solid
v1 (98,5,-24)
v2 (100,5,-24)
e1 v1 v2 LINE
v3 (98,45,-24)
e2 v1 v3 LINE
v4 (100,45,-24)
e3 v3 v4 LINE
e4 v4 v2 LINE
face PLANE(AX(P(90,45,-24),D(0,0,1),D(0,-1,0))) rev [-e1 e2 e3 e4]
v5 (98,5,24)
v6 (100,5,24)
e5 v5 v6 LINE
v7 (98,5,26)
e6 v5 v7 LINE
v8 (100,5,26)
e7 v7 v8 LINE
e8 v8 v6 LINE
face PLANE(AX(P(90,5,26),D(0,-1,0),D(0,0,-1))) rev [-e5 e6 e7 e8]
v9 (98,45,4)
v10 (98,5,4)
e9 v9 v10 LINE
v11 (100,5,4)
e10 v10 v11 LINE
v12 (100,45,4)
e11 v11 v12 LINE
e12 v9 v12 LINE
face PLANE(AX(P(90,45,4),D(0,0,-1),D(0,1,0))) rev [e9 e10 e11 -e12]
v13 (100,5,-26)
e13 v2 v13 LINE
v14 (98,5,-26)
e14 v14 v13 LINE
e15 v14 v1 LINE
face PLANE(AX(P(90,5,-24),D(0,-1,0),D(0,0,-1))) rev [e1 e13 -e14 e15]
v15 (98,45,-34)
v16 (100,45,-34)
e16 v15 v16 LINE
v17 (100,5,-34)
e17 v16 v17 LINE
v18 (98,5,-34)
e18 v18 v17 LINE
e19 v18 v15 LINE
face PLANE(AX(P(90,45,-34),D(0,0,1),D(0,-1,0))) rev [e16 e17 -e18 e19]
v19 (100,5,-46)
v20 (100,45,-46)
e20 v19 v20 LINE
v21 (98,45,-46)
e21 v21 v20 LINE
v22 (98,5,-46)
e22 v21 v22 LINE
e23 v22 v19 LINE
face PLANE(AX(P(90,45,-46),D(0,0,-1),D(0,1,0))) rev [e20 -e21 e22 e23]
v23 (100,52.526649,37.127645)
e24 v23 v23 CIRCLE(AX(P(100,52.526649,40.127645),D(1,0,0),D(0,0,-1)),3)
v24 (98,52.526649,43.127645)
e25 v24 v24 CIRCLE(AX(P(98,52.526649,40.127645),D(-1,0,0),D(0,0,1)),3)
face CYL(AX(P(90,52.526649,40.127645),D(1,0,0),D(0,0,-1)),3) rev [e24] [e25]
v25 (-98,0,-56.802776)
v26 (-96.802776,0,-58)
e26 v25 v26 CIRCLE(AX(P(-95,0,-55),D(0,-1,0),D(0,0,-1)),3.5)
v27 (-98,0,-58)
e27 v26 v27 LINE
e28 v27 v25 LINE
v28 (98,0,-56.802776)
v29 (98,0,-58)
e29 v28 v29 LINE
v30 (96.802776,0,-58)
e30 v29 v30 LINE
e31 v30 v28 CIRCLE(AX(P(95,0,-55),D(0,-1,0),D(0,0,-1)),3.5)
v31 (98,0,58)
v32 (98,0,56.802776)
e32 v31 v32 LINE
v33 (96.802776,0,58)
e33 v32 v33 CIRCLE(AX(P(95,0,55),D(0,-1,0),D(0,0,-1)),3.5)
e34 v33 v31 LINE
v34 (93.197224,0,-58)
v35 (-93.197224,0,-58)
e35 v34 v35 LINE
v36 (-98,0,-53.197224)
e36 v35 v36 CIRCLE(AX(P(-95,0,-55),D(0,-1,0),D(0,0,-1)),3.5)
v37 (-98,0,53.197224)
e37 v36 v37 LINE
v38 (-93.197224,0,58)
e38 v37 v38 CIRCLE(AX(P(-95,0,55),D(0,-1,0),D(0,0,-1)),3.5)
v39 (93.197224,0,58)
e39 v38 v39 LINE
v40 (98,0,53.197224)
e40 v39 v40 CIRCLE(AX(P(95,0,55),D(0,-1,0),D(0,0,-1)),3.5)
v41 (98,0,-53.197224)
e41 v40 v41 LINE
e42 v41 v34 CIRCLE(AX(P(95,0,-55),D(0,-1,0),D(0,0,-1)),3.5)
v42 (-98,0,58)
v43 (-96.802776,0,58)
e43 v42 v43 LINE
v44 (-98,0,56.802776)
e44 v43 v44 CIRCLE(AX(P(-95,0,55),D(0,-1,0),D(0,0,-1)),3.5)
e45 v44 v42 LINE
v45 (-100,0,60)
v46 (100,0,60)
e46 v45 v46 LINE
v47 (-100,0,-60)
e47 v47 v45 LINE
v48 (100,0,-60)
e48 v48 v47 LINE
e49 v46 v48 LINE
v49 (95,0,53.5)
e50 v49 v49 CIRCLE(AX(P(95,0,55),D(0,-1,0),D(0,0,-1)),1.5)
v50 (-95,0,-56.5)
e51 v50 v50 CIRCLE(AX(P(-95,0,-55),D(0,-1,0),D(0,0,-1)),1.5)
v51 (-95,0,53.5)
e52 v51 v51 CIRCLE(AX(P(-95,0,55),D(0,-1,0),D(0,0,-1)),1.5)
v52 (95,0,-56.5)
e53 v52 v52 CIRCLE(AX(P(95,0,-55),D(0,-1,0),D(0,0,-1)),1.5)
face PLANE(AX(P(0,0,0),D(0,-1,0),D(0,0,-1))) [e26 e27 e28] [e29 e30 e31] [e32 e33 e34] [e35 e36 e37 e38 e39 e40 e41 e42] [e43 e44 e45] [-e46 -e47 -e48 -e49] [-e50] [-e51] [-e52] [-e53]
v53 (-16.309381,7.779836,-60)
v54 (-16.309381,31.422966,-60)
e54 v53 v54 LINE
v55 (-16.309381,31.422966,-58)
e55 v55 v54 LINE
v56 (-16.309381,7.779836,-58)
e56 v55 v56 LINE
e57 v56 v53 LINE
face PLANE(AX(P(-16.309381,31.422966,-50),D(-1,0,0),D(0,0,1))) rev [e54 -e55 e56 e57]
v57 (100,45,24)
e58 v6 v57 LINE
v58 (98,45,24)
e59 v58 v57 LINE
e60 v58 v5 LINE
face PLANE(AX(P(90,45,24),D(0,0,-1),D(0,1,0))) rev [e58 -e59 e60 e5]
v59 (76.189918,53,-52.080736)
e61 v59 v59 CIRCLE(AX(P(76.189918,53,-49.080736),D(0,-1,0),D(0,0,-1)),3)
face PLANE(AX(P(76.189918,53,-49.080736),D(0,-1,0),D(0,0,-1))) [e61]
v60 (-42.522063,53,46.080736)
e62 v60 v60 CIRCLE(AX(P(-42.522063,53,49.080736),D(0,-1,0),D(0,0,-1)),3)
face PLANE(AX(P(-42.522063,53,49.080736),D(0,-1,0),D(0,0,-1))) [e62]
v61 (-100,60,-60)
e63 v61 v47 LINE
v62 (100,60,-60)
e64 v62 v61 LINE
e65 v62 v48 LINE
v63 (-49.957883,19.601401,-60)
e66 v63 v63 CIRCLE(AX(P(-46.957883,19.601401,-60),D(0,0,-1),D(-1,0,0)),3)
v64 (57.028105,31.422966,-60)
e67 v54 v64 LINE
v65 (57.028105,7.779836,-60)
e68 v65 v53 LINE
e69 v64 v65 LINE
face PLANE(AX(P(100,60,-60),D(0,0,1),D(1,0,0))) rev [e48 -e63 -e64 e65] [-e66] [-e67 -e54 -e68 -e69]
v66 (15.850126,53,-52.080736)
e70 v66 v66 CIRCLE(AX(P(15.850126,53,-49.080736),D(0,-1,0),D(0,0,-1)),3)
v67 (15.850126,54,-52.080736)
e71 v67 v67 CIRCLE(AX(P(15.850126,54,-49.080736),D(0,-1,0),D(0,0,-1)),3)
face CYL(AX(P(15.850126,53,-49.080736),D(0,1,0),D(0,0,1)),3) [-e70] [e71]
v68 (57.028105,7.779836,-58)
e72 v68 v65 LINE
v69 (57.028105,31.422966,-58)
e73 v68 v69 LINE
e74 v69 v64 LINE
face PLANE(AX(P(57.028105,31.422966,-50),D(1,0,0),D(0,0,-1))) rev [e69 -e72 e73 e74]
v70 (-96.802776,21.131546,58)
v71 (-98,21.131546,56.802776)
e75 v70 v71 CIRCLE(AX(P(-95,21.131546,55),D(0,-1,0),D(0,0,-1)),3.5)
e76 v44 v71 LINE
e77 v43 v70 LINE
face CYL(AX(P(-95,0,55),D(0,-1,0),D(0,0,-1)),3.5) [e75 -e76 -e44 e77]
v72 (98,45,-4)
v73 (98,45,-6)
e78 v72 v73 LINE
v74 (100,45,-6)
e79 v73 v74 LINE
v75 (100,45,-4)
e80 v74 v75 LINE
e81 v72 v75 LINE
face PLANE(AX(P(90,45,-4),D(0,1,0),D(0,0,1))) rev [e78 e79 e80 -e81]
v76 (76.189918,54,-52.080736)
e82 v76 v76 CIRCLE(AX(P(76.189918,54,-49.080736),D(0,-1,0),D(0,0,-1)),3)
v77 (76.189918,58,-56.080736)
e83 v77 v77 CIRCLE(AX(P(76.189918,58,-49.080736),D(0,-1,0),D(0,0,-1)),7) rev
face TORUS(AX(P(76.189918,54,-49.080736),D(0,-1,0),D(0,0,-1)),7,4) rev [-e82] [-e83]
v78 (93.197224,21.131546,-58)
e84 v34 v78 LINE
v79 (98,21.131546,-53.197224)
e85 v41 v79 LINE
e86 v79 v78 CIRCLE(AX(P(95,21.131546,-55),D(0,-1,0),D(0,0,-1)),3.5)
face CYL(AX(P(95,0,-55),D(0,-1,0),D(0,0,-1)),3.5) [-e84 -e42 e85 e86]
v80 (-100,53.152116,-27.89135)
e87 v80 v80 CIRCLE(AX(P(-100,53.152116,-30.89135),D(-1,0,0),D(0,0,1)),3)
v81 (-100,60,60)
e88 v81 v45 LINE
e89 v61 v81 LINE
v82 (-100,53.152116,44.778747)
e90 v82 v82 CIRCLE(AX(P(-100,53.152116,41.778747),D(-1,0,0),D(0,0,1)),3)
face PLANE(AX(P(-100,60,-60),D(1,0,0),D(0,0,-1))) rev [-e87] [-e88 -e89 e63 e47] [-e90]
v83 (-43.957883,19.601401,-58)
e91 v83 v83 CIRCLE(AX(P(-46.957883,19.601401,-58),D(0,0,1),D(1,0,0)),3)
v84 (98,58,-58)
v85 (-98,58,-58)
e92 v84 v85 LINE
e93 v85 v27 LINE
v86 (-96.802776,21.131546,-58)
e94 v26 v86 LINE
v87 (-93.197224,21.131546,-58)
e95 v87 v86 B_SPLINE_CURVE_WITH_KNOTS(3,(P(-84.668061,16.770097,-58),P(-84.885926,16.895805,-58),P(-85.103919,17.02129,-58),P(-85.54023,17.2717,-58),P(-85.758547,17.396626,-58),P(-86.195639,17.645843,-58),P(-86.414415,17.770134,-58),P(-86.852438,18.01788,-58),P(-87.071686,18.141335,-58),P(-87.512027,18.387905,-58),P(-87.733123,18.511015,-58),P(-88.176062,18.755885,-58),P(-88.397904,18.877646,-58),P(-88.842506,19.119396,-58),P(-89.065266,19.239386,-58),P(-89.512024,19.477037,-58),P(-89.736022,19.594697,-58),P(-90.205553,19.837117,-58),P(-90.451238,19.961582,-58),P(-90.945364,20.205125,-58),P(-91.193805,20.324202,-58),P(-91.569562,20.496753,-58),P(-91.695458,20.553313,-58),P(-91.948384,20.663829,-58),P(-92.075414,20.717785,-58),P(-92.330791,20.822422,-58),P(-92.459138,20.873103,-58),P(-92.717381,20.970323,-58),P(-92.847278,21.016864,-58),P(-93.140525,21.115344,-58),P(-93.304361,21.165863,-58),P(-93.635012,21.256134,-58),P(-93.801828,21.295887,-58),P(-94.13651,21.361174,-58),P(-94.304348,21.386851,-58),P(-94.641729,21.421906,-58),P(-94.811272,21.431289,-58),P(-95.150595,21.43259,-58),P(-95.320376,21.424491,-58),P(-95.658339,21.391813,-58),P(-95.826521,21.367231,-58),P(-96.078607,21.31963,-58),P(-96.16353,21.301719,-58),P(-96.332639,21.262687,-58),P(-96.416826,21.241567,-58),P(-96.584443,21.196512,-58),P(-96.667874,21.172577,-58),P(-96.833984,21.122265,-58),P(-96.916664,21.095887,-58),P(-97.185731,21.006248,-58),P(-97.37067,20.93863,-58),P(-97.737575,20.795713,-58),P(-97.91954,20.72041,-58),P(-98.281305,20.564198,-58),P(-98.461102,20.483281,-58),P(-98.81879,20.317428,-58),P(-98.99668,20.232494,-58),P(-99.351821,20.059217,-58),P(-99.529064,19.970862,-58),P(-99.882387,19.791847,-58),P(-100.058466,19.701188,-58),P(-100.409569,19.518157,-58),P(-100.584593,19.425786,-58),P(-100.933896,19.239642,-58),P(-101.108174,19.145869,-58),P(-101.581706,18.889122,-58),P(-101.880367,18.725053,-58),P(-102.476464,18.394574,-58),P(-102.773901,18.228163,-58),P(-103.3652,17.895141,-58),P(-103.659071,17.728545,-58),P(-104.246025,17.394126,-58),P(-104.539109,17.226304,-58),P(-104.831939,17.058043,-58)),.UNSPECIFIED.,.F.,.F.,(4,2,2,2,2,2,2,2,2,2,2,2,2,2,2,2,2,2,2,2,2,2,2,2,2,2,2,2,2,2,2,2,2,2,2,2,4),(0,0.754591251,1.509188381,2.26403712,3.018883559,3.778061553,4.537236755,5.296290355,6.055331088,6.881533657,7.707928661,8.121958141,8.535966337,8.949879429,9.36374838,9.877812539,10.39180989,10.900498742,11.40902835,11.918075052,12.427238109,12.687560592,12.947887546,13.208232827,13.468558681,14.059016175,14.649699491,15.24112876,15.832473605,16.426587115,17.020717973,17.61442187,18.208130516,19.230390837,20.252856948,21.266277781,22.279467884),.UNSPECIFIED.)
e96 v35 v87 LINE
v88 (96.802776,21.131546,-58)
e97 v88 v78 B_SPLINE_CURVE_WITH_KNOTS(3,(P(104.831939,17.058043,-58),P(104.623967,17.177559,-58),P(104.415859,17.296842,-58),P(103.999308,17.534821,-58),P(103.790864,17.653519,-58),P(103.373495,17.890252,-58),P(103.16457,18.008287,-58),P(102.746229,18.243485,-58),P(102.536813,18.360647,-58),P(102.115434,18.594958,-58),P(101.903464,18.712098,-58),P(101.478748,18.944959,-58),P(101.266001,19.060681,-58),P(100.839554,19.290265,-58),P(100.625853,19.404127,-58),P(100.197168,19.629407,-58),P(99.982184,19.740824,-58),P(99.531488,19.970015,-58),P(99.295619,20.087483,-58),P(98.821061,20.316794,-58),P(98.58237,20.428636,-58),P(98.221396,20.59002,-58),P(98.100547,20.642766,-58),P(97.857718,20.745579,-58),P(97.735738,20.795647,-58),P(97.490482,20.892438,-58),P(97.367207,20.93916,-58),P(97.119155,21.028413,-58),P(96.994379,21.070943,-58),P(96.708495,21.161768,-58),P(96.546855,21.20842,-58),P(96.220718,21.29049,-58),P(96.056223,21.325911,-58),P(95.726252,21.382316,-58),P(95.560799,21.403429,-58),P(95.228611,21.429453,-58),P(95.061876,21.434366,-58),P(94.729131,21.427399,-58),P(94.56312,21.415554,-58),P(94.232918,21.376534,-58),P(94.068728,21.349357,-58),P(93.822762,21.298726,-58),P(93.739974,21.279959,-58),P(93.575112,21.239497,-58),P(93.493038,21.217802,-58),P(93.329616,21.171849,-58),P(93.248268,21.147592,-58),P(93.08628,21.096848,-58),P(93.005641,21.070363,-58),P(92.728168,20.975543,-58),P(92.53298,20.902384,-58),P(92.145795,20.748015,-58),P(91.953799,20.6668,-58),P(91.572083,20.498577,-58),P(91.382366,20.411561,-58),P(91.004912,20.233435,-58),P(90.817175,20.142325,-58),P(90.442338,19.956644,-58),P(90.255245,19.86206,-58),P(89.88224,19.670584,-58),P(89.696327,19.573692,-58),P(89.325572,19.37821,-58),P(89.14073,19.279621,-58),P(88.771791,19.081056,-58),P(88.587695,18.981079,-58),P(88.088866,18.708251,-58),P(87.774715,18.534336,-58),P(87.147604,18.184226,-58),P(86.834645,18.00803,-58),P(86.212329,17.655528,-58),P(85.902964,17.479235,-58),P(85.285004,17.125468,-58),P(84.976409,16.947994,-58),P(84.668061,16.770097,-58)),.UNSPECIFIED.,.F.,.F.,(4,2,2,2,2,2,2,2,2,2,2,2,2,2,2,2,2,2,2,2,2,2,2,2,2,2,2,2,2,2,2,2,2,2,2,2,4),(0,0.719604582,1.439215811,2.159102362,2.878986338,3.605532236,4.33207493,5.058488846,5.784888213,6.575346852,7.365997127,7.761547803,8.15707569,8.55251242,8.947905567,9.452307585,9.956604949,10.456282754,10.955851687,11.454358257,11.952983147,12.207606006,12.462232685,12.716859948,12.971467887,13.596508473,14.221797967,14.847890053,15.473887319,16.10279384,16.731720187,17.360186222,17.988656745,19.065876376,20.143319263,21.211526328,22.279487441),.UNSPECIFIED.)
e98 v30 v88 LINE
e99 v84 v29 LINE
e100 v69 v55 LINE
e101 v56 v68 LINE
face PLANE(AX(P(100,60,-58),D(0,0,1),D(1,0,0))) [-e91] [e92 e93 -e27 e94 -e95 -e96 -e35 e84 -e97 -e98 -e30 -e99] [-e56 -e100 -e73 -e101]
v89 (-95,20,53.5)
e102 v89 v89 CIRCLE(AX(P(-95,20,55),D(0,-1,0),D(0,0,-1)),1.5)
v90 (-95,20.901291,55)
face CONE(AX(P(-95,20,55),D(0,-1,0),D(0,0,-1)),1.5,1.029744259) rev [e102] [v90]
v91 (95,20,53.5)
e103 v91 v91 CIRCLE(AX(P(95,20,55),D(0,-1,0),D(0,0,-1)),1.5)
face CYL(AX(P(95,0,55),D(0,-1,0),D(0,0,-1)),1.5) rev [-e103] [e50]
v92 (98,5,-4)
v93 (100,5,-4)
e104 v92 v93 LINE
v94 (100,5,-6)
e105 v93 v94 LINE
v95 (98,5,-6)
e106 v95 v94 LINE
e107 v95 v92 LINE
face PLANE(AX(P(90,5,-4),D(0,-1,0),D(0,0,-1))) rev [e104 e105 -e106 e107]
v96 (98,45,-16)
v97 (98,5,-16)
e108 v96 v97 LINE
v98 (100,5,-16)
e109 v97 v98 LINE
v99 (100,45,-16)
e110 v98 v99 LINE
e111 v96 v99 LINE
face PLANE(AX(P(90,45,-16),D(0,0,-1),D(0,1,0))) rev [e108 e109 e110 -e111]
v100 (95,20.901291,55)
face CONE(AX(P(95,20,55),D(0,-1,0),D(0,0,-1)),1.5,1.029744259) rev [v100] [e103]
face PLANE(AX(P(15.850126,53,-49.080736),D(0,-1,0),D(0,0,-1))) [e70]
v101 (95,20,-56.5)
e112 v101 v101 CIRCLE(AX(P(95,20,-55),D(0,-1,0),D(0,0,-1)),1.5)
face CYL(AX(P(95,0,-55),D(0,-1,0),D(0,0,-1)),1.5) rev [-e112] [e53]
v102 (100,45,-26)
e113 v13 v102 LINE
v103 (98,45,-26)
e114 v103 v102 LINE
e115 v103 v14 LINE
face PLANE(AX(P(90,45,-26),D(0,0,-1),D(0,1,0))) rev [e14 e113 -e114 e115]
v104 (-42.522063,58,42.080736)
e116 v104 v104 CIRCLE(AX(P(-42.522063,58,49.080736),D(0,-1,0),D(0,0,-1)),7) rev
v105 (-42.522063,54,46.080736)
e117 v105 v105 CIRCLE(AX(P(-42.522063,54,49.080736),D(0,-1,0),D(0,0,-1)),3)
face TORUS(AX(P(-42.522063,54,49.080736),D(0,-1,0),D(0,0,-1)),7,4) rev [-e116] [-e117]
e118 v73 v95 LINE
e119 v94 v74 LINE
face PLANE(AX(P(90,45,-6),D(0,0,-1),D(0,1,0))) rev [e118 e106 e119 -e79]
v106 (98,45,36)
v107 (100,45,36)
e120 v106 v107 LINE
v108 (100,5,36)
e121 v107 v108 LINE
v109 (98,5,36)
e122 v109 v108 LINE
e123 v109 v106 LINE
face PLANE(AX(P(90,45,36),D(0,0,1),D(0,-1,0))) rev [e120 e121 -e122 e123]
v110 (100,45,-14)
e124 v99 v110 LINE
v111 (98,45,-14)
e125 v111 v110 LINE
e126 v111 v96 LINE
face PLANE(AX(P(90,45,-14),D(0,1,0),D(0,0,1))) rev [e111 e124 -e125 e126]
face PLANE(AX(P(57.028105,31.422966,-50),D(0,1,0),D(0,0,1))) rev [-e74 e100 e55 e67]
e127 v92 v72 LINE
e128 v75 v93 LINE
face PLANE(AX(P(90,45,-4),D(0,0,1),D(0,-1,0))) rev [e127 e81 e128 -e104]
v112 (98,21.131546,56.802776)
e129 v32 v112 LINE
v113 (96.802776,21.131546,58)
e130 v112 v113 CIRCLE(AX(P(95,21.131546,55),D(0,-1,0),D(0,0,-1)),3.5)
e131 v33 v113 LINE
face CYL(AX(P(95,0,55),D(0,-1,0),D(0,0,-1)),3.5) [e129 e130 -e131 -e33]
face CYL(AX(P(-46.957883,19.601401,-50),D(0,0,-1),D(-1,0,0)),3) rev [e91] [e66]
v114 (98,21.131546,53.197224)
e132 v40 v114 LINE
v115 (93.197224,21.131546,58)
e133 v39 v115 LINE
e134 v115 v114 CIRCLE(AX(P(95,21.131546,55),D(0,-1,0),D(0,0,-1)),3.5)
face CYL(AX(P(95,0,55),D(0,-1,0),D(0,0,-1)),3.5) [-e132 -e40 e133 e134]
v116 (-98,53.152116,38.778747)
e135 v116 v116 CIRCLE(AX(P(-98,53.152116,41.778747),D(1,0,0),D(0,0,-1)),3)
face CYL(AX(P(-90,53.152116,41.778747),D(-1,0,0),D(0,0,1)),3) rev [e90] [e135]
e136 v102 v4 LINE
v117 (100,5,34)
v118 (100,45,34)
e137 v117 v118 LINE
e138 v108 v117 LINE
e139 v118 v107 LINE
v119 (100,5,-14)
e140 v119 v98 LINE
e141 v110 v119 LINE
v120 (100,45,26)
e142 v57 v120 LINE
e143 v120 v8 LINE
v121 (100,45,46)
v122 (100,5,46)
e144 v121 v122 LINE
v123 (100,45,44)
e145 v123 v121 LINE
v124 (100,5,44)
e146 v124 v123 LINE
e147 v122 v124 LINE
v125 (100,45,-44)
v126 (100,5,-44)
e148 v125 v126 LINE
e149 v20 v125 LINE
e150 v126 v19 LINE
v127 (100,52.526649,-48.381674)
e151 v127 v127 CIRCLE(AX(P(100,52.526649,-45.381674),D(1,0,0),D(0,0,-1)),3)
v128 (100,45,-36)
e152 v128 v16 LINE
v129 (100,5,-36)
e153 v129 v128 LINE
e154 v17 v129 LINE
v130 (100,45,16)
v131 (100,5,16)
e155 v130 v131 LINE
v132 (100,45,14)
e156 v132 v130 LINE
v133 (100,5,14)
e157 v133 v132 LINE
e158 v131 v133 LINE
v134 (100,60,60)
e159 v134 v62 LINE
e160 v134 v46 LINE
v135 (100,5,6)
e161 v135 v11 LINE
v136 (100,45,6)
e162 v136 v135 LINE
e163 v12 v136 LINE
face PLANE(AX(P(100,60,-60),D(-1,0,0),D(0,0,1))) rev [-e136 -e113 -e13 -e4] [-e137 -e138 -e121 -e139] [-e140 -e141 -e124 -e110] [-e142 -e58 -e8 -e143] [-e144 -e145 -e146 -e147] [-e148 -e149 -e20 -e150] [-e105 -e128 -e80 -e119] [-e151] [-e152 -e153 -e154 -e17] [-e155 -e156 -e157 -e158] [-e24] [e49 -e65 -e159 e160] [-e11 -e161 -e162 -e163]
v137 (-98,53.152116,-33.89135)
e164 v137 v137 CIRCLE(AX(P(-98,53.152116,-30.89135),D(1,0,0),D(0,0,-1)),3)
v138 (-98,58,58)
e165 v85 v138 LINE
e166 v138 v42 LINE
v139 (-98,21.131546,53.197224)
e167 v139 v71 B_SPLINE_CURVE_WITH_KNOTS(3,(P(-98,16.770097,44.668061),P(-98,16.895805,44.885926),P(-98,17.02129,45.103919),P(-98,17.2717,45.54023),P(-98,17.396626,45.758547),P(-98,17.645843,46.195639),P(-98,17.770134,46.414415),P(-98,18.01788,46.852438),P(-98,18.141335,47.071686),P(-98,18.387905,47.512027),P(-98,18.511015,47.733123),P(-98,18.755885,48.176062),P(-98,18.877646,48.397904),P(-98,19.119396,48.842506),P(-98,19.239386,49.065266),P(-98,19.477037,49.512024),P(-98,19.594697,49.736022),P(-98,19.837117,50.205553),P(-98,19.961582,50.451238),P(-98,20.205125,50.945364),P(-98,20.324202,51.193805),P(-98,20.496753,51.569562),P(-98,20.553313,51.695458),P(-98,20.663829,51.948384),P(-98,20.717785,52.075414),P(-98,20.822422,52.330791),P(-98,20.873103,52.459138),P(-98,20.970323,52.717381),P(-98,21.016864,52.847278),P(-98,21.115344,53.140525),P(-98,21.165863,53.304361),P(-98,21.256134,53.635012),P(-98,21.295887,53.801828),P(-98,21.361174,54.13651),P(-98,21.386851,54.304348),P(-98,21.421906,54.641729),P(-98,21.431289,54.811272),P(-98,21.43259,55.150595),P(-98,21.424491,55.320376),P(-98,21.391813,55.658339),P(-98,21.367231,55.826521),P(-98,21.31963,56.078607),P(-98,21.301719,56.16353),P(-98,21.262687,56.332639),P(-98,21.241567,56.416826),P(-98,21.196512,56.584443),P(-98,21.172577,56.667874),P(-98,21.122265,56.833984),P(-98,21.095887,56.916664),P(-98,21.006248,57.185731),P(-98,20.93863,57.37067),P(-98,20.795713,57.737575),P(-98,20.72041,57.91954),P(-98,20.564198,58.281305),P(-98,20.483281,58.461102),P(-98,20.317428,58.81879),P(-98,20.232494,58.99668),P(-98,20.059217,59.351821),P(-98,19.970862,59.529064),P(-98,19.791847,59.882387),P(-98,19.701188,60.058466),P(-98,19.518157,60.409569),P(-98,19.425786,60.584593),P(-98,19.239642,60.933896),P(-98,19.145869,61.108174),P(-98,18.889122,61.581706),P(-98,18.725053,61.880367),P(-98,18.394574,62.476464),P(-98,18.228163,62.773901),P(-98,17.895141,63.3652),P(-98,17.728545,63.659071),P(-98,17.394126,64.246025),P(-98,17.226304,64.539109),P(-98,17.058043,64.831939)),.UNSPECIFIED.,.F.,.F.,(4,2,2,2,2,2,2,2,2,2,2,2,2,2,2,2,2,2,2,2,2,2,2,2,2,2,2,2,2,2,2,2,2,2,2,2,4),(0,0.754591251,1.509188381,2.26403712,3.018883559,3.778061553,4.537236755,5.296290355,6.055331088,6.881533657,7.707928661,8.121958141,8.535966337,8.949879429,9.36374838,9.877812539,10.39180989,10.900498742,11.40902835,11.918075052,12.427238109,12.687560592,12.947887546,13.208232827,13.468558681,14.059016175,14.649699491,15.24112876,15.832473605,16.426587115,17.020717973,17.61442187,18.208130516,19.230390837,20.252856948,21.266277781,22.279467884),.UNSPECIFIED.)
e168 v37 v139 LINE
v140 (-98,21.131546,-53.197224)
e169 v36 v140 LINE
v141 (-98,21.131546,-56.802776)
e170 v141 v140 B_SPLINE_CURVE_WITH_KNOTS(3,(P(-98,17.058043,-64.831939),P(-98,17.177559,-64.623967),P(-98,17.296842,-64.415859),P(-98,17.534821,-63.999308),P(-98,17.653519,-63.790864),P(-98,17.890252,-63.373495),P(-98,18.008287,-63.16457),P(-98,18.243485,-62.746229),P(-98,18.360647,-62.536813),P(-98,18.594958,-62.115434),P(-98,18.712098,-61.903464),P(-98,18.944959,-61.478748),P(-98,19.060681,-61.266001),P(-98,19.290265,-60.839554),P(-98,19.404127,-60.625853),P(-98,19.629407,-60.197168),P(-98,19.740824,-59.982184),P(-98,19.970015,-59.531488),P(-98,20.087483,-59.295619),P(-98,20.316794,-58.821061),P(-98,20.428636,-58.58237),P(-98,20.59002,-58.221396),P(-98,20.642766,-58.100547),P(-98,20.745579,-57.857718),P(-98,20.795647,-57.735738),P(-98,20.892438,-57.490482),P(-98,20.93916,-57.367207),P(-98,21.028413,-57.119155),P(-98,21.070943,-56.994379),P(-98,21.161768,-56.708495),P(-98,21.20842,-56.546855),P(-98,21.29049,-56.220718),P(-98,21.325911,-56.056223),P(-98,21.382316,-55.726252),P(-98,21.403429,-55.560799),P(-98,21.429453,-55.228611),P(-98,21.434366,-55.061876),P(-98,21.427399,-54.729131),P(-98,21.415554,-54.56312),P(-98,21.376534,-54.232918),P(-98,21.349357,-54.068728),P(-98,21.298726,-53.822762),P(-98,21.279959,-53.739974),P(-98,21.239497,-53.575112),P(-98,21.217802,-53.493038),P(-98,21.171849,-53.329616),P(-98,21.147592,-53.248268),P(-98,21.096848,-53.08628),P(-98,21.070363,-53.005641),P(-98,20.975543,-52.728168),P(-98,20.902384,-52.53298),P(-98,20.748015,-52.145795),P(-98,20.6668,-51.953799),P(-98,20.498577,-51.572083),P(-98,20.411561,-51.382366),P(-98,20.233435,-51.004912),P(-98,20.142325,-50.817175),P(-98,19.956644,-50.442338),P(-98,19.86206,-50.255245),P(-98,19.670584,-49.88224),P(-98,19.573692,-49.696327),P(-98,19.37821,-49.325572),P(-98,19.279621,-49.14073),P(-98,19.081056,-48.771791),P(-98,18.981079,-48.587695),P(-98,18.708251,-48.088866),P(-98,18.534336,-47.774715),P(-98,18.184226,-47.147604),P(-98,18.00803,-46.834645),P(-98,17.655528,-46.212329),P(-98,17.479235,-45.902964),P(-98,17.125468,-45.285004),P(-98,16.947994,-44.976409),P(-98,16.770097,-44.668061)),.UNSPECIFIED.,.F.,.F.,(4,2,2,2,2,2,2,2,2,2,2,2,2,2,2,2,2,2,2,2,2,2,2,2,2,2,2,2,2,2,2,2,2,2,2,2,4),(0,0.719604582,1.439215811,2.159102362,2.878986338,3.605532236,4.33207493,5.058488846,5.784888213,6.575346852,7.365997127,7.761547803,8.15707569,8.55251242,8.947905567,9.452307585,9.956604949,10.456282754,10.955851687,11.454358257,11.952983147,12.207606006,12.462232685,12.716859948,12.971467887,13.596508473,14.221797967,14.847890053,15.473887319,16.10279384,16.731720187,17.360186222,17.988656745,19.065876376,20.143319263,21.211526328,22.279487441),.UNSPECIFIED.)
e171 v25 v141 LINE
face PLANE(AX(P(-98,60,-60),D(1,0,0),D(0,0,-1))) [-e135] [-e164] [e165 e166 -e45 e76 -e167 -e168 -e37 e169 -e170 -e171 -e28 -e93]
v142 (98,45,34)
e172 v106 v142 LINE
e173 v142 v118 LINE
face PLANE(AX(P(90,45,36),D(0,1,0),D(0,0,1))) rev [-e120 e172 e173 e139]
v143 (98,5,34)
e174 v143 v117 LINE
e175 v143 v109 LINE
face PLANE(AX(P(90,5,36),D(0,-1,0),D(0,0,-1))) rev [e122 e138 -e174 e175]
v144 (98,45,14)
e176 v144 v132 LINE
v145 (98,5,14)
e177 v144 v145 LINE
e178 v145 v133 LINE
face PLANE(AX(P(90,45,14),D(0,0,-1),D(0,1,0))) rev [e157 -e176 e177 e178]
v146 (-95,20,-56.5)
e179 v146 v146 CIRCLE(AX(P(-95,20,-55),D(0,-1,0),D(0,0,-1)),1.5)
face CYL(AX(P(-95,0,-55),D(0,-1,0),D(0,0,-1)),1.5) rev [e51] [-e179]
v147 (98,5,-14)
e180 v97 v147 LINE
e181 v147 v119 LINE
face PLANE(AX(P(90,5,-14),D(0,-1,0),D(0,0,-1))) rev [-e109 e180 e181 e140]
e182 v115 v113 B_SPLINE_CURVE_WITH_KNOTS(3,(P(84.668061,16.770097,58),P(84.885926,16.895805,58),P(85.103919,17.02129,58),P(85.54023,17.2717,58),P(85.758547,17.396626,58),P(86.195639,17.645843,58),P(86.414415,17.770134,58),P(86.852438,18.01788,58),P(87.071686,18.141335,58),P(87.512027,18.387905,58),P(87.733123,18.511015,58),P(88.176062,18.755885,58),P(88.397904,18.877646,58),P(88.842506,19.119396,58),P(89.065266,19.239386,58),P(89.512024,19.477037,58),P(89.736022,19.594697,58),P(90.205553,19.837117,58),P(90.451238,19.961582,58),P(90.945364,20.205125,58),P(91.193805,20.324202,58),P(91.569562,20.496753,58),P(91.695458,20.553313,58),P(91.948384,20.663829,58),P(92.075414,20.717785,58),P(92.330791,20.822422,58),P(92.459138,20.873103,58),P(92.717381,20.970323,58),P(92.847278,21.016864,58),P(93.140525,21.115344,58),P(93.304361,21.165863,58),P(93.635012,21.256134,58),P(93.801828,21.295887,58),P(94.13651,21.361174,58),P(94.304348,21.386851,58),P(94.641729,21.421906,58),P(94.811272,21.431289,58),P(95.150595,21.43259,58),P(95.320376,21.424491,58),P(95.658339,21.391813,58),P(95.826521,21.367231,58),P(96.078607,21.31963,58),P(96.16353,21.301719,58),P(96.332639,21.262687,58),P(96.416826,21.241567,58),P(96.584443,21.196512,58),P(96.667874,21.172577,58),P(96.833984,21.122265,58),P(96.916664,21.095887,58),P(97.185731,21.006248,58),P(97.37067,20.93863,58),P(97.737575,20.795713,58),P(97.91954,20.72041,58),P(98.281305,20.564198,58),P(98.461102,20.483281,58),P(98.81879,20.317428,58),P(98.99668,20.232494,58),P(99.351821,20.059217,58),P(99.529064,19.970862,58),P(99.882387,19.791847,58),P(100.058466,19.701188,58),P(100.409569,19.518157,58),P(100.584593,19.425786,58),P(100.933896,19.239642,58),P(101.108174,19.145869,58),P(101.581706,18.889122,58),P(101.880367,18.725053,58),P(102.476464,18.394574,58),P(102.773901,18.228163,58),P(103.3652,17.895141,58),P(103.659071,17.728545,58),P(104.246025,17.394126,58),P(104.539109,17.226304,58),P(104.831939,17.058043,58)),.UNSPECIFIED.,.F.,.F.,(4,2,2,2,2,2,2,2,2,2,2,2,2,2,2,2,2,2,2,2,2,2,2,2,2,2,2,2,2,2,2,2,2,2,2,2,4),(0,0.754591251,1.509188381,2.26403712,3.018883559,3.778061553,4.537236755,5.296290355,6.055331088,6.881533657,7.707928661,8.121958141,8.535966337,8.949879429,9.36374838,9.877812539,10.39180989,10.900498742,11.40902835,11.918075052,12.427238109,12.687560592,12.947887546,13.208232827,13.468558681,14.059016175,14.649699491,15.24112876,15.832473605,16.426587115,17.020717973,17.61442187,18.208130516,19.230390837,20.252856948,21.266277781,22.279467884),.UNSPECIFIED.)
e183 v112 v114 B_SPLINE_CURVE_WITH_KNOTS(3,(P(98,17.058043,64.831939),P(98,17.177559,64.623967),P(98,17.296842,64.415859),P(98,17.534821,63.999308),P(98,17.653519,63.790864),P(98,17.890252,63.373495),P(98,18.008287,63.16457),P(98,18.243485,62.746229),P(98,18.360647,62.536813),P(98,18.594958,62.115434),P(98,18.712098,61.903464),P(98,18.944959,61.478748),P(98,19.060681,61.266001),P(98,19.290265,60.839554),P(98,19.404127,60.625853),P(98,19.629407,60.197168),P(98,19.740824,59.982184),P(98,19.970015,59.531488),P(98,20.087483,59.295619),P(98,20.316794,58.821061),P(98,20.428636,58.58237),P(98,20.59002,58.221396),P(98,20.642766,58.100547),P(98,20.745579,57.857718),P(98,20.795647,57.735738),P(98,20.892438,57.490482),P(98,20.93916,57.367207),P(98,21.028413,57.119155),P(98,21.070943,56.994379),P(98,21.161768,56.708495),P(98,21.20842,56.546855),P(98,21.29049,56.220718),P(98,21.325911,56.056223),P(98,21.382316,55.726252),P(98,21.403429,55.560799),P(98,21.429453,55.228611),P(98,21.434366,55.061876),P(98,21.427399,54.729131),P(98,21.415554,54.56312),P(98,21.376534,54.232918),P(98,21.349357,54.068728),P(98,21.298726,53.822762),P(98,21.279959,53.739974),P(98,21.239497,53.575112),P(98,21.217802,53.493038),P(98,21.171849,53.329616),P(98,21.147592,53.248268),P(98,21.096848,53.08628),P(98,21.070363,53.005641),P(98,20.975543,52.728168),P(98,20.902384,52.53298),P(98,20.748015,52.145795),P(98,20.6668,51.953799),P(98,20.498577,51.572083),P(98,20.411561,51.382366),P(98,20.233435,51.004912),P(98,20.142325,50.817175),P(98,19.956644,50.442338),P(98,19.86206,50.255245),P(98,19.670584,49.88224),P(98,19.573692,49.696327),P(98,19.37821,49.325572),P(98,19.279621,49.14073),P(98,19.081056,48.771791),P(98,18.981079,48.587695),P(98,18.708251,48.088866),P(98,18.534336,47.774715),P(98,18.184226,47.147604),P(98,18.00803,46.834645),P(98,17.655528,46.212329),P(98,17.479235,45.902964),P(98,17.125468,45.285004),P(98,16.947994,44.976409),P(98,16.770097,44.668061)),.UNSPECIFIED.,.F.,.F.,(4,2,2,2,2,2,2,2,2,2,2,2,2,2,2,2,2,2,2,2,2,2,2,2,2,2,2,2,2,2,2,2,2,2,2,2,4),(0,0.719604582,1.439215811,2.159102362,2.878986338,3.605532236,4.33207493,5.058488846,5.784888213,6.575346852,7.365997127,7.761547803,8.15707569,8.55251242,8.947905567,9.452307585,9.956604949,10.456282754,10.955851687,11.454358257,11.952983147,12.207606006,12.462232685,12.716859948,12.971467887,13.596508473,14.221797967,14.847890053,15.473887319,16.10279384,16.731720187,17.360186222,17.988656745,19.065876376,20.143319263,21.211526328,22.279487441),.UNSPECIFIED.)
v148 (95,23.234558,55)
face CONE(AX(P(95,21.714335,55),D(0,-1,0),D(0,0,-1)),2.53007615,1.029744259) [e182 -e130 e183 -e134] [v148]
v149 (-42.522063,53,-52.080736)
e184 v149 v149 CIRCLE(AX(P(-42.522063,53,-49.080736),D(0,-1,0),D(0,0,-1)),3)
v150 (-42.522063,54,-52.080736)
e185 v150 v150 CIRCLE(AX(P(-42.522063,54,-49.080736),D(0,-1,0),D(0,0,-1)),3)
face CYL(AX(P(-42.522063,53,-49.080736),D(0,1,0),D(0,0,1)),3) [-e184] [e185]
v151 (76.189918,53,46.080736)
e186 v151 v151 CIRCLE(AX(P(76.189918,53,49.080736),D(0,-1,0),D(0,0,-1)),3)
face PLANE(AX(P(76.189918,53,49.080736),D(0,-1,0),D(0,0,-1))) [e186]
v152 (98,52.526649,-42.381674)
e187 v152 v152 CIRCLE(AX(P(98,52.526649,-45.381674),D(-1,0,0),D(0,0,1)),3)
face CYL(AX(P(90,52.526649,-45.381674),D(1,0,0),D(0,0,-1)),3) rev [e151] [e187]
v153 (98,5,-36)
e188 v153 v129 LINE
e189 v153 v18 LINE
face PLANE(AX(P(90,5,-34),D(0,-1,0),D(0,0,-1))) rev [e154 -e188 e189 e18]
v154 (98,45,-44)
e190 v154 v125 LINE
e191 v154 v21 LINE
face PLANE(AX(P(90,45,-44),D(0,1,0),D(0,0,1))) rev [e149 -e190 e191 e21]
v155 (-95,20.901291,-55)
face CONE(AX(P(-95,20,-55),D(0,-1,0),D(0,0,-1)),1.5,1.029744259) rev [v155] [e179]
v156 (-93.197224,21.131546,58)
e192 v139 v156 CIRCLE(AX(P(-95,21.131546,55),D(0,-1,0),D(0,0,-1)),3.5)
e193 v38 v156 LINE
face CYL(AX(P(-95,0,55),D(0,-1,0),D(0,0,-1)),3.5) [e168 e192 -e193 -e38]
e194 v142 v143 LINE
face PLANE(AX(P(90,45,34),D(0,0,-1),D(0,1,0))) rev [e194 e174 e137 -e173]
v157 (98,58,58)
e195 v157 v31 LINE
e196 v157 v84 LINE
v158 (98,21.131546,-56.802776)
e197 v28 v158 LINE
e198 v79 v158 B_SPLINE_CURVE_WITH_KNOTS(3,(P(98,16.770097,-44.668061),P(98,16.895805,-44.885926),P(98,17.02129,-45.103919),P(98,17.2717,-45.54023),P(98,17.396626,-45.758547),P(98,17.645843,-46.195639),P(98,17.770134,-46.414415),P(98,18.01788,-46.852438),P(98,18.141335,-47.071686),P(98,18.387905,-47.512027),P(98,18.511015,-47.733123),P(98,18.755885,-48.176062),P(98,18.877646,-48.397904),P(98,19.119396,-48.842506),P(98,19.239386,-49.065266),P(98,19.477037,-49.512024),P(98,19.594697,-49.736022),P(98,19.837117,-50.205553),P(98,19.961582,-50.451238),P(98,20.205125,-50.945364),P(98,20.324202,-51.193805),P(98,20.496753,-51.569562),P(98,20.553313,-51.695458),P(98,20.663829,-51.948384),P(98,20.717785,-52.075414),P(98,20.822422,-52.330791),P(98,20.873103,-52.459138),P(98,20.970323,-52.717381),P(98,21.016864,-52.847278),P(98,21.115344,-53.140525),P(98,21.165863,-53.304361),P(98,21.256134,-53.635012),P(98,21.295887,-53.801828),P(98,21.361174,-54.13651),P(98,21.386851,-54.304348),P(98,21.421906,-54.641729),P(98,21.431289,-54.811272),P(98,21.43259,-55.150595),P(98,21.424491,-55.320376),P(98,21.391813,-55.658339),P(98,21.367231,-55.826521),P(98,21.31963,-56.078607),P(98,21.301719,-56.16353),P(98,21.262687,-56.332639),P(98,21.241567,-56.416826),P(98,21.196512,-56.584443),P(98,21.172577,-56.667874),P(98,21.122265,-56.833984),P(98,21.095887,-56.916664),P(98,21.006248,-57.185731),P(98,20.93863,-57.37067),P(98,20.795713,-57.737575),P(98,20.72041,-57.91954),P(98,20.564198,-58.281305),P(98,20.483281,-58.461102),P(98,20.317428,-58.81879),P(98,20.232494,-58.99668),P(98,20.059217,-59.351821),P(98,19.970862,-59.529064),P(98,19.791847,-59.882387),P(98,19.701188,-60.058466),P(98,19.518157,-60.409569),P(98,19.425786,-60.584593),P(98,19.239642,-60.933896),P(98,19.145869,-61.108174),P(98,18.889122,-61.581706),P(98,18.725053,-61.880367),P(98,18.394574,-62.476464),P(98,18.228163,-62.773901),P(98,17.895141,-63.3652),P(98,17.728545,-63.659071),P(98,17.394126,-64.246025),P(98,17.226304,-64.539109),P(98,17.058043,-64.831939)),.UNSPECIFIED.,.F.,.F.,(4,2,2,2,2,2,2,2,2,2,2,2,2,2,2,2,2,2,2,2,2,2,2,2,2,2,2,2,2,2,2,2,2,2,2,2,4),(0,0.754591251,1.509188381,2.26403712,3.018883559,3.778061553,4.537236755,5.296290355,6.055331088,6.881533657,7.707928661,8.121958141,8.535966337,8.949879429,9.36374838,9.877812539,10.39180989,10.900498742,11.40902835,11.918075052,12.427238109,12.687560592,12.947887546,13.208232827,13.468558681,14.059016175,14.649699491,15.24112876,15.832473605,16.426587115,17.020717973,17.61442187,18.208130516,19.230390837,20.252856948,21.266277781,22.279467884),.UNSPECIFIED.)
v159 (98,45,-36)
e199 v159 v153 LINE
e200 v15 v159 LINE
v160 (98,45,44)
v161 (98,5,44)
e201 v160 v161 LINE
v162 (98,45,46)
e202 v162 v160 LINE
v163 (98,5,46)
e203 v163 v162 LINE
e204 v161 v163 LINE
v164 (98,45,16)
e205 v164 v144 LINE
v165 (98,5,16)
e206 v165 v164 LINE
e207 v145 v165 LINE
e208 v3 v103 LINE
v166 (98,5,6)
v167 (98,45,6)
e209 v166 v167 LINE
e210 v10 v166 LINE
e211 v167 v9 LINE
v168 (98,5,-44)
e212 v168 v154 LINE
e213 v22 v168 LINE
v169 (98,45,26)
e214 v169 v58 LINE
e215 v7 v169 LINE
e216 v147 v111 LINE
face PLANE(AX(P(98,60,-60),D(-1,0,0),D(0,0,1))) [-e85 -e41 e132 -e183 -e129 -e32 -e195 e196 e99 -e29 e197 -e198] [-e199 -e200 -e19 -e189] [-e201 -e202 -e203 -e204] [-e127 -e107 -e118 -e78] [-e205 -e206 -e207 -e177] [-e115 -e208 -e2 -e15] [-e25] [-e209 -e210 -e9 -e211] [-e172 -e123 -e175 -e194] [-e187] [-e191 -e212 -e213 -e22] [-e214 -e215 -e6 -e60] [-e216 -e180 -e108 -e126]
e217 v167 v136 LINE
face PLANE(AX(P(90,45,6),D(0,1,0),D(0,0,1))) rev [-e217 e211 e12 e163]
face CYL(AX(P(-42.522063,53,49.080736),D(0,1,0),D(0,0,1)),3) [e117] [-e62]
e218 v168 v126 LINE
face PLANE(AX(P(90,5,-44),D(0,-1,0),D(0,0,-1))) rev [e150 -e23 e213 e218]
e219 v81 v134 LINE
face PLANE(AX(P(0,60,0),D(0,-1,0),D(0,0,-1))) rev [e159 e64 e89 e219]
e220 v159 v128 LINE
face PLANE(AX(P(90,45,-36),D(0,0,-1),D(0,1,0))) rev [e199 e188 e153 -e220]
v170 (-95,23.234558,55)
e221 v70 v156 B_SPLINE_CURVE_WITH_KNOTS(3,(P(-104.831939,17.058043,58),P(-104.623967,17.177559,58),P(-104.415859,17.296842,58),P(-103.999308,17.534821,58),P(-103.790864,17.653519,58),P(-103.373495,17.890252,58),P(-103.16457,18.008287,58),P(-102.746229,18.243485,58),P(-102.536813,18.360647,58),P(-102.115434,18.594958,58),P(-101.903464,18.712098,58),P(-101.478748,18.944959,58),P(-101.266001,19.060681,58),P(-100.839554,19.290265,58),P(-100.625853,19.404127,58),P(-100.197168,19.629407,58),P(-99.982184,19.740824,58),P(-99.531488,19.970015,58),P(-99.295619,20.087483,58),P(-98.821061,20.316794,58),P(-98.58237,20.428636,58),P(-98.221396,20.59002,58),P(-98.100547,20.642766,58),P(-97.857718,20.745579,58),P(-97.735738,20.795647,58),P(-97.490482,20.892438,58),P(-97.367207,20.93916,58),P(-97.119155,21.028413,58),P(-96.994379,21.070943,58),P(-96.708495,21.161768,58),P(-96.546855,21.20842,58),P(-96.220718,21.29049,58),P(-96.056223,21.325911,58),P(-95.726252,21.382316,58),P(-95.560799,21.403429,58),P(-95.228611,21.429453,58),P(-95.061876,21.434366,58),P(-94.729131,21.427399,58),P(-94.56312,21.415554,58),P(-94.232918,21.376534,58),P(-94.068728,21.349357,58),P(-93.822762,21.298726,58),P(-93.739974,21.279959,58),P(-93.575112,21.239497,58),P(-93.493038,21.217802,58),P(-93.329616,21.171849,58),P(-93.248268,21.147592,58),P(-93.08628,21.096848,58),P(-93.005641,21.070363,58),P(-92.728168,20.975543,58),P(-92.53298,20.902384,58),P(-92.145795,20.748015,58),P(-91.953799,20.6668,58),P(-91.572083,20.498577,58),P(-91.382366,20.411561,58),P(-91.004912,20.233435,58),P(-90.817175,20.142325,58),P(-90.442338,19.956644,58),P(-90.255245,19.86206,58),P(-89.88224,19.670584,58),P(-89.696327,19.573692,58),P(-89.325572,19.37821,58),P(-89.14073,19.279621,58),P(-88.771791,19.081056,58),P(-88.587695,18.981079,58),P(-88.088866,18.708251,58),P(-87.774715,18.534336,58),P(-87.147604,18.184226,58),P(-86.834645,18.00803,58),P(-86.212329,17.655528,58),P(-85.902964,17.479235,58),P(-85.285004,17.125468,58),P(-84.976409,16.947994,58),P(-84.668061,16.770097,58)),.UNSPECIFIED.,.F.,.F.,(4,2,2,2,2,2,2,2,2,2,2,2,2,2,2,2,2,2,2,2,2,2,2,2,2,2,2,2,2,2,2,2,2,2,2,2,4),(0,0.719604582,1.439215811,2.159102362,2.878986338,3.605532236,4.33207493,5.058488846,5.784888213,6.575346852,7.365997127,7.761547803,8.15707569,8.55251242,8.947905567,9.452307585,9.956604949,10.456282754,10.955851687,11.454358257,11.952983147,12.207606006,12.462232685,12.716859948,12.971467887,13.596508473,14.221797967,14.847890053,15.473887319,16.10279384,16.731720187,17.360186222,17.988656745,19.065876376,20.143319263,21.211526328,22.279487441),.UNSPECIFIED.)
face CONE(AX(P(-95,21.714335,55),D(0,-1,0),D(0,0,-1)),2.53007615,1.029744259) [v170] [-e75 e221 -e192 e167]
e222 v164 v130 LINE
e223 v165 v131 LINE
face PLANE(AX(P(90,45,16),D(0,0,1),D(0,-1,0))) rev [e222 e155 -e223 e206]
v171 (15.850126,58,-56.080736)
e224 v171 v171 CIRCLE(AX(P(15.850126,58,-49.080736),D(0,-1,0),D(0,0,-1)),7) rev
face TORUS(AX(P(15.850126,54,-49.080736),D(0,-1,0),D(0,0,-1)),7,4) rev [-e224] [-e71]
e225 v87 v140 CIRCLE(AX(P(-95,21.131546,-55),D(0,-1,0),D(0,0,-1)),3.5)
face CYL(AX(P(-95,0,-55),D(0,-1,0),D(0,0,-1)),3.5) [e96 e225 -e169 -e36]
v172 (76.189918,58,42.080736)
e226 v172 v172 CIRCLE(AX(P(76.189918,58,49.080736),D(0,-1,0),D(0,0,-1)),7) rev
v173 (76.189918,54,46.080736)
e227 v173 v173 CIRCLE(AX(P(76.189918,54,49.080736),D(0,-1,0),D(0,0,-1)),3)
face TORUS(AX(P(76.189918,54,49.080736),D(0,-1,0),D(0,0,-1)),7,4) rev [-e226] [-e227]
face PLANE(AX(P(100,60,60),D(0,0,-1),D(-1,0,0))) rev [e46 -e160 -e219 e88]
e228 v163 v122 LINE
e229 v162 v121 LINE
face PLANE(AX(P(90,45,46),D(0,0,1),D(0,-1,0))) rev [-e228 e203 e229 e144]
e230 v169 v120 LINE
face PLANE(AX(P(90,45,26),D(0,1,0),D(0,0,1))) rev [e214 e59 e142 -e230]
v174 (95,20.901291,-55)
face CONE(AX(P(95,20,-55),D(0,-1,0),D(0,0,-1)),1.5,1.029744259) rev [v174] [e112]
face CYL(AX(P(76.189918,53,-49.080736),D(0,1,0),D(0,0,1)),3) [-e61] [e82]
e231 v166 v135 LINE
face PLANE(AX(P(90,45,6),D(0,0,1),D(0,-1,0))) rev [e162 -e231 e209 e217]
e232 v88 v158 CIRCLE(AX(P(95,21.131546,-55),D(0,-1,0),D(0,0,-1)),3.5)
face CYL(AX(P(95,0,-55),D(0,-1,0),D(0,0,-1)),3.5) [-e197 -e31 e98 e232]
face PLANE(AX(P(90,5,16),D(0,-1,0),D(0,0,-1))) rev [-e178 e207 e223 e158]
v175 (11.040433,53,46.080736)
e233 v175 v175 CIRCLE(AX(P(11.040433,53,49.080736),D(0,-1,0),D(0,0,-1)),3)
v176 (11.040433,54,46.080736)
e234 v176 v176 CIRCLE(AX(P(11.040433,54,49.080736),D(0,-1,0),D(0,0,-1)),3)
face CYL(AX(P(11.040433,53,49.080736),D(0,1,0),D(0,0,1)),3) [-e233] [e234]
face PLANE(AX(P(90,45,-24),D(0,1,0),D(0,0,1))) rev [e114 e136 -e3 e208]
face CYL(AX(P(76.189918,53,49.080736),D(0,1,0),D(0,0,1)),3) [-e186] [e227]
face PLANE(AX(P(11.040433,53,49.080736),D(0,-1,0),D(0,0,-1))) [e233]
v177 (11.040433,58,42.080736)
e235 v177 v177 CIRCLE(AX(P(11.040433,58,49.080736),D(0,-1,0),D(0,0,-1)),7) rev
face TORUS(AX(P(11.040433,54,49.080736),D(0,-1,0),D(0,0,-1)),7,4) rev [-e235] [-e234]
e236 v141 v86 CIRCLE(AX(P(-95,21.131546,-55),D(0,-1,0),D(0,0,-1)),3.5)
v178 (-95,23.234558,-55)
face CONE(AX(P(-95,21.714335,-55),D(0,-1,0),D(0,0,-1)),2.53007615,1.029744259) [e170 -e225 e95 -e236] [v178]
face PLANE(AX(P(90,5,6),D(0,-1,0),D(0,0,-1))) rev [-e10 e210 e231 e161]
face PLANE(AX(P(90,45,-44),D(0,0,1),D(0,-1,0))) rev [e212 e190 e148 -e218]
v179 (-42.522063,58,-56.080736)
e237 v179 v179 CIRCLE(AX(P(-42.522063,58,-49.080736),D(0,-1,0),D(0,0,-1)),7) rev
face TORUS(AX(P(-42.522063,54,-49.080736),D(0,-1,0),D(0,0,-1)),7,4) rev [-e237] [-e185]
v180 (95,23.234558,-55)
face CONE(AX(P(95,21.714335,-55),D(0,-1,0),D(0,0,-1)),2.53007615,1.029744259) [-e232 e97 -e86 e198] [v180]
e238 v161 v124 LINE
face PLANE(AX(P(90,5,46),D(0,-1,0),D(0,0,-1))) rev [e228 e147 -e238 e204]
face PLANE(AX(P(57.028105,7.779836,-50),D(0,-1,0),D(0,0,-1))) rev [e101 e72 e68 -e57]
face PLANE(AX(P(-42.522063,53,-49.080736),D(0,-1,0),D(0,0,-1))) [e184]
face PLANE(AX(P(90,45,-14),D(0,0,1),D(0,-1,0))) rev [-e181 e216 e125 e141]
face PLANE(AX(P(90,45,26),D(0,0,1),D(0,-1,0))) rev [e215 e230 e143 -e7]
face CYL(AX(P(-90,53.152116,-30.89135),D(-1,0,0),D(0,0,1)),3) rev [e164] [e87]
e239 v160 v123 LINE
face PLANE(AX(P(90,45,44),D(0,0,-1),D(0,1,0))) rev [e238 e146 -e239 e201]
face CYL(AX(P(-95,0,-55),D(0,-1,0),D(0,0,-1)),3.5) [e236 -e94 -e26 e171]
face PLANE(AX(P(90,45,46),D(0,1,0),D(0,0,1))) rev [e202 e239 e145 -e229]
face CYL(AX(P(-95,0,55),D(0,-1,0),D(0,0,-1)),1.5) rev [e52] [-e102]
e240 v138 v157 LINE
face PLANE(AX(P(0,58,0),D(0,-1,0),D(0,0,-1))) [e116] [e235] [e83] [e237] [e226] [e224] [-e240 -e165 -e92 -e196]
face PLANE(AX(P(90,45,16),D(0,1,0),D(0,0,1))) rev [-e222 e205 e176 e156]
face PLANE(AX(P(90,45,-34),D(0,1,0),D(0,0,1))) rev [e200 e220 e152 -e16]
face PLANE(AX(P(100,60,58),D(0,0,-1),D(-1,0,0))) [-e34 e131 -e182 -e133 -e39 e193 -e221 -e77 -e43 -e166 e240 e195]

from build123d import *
from OCP.BRepAlgoAPI import BRepAlgoAPI_Cut
from OCP.TopTools import TopTools_ListOfShape

# Parameters (mm, degrees)
SKETCH2_W                 = 200
SKETCH2_H                 = 120
BOSS_EXTRUDE1_DEPTH       = 60
F_3_0MM_DOWEL_HOLE1_D     = 3
F_3_0MM_DOWEL_HOLE1_DEPTH = 20
F_3_0MM_DOWEL_HOLE1_TIP   = 0.901290929
SHELL23_DEPTH             = 58
SHELL23_START             = 21.131545056
SHELL23_2_DEPTH           = 36.868454944
SKETCH13_R                = 3
CUT_EXTRUDE5_DEPTH        = 10
SKETCH14_R                = 3
BOSS_EXTRUDE2_DEPTH       = 5
FILLET11_R                = 4
SKETCH15_R                = 3
SKETCH15_W                = 73.337485677
SKETCH15_H                = 23.643129711
CUT_EXTRUDE6_DEPTH        = 10
SKETCH16_W                = 2
SKETCH16_H                = 40
CUT_EXTRUDE7_DEPTH        = 10
LPATTERN1_COUNT           = 10
LPATTERN1_PITCH           = 10
SKETCH18_R                = 3
CUT_EXTRUDE8_DEPTH        = 10


with BuildPart() as part:
    # Sketch2 → Boss-Extrude1 (new body)
    with BuildSketch(Plane(origin=(0, 0, 0), x_dir=(1, 0, 0), z_dir=(0, 1, 0))):
        Rectangle(SKETCH2_W, SKETCH2_H)
    extrude(amount=BOSS_EXTRUDE1_DEPTH)

    # Ø3.0mm Dowel Hole1
    with Locations(Plane(origin=(-95, 0, 55), x_dir=(0, 0, -1), z_dir=(0, -1, 0))):
        with Locations((0, 0), (110, 0), (110, 190), (0, 190)):
            Hole(F_3_0MM_DOWEL_HOLE1_D / 2, depth=F_3_0MM_DOWEL_HOLE1_DEPTH)
            with Locations((0, 0, -(F_3_0MM_DOWEL_HOLE1_DEPTH + F_3_0MM_DOWEL_HOLE1_TIP / 2))):  # 118° drill point
                Cone(0, F_3_0MM_DOWEL_HOLE1_D / 2, F_3_0MM_DOWEL_HOLE1_TIP, mode=Mode.SUBTRACT)


with BuildPart() as shell23_tool:
    # Shell23: read off the stored shape, not the designer's step
    # Shell23 outline → Shell23 (new body)
    with BuildSketch(Plane(origin=(0, 0, 0), x_dir=(1, 0, 0), z_dir=(0, 1, 0))):
        with BuildLine():
            Line((-98, -58), (-96.802775638, -58))
            ThreePointArc((-96.802775638, -58), (-97.474873734, -57.474873734), (-98, -56.802775638))
            Line((-98, -56.802775638), (-98, -58))
        make_face()
        with BuildLine():
            ThreePointArc((-98, -53.197224362), (-92.525126266, -52.525126266), (-93.197224362, -58))
            Line((-93.197224362, -58), (93.197224362, -58))
            ThreePointArc((93.197224362, -58), (92.525126266, -52.525126266), (98, -53.197224362))
            Line((98, -53.197224362), (98, 53.197224362))
            ThreePointArc((98, 53.197224362), (92.525126266, 52.525126266), (93.197224362, 58))
            Line((93.197224362, 58), (-93.197224362, 58))
            ThreePointArc((-93.197224362, 58), (-92.525126266, 52.525126266), (-98, 53.197224362))
            Line((-98, 53.197224362), (-98, -53.197224362))
        make_face()
        with BuildLine():
            ThreePointArc((98, -56.802775638), (97.474873734, -57.474873734), (96.802775638, -58))
            Line((96.802775638, -58), (98, -58))
            Line((98, -58), (98, -56.802775638))
        make_face()
        with BuildLine():
            Line((-98, 58), (-98, 56.802775638))
            ThreePointArc((-98, 56.802775638), (-97.474873734, 57.474873734), (-96.802775638, 58))
            Line((-96.802775638, 58), (-98, 58))
        make_face()
        with BuildLine():
            ThreePointArc((96.802775638, 58), (97.474873734, 57.474873734), (98, 56.802775638))
            Line((98, 56.802775638), (98, 58))
            Line((98, 58), (96.802775638, 58))
        make_face()
    extrude(amount=SHELL23_DEPTH)


with BuildPart() as part_1:
    add(part.part)

    # Shell23: cut by shell23_tool, with a tolerance
    shell23_stock = TopTools_ListOfShape()
    shell23_stock.Append(part_1.part.wrapped)
    shell23_tools = TopTools_ListOfShape()
    shell23_tools.Append(shell23_tool.part.wrapped)
    shell23_cut = BRepAlgoAPI_Cut()
    shell23_cut.SetArguments(shell23_stock)
    shell23_cut.SetTools(shell23_tools)
    shell23_cut.SetFuzzyValue(0.00001)
    shell23_cut.Build()
    add(Compound.cast(shell23_cut.Shape()).solids(), mode=Mode.REPLACE)


with BuildPart() as shell23_2_tool:
    # Shell23 2 outline → Shell23 2 (new body)
    with BuildSketch(Plane(origin=(0, 0, 0), x_dir=(1, 0, 0), z_dir=(0, 1, 0)).offset(SHELL23_START)):
        with BuildLine():
            ThreePointArc((-98, -56.802775638), (-97.474873734, -57.474873734), (-96.802775638, -58))
            Line((-96.802775638, -58), (-93.197224362, -58))
            ThreePointArc((-93.197224362, -58), (-92.525126266, -52.525126266), (-98, -53.197224362))
            Line((-98, -53.197224362), (-98, -56.802775638))
        make_face()
        with BuildLine():
            ThreePointArc((98, -53.197224362), (92.525126266, -52.525126266), (93.197224362, -58))
            Line((93.197224362, -58), (96.802775638, -58))
            ThreePointArc((96.802775638, -58), (97.474873734, -57.474873734), (98, -56.802775638))
            Line((98, -56.802775638), (98, -53.197224362))
        make_face()
        with BuildLine():
            Line((-98, 56.802775638), (-98, 53.197224362))
            ThreePointArc((-98, 53.197224362), (-92.525126266, 52.525126266), (-93.197224362, 58))
            Line((-93.197224362, 58), (-96.802775638, 58))
            ThreePointArc((-96.802775638, 58), (-97.474873734, 57.474873734), (-98, 56.802775638))
        make_face()
        with BuildLine():
            ThreePointArc((93.197224362, 58), (92.525126266, 52.525126266), (98, 53.197224362))
            Line((98, 53.197224362), (98, 56.802775638))
            ThreePointArc((98, 56.802775638), (97.474873734, 57.474873734), (96.802775638, 58))
            Line((96.802775638, 58), (93.197224362, 58))
        make_face()
    extrude(amount=SHELL23_2_DEPTH)


with BuildPart() as part_2:
    add(part_1.part)

    # Shell23 2: cut by shell23_2_tool, with a tolerance
    shell23_2_stock = TopTools_ListOfShape()
    shell23_2_stock.Append(part_2.part.wrapped)
    shell23_2_tools = TopTools_ListOfShape()
    shell23_2_tools.Append(shell23_2_tool.part.wrapped)
    shell23_2_cut = BRepAlgoAPI_Cut()
    shell23_2_cut.SetArguments(shell23_2_stock)
    shell23_2_cut.SetTools(shell23_2_tools)
    shell23_2_cut.SetFuzzyValue(0.00001)
    shell23_2_cut.Build()
    add(Compound.cast(shell23_2_cut.Shape()).solids(), mode=Mode.REPLACE)


with BuildPart() as shell23_3_tool:
    # Shell23 3 outline → Shell23 3 (revolve)
    with BuildSketch(Plane(origin=(-95, 0, -55), x_dir=(1, 0, 0), z_dir=(0, 0, 1))):
        Polygon((3.50000013, 21.131545478), (0, 23.234557723), (0, 21.131545056), align=None)
    revolve(axis=Axis((-95, 0, -55), (0, 1, 0)))


with BuildPart() as part_3:
    add(part_2.part)


with BuildPart() as part_4:
    # Shell23 3: joined with shell23_3_tool
    add(part_3.part.fuse(shell23_3_tool.part, tol=0.00001))


with BuildPart() as shell23_4_tool:
    # Shell23 4 outline → Shell23 4 (revolve)
    with BuildSketch(Plane(origin=(-95, 0, 55), x_dir=(1, 0, 0), z_dir=(0, 0, 1))):
        Polygon((3.50000013, 21.131545478), (0, 23.234557723), (0, 21.131545056), align=None)
    revolve(axis=Axis((-95, 0, 55), (0, 1, 0)))


with BuildPart() as part_5:
    add(part_4.part)


with BuildPart() as part_6:
    # Shell23 4: joined with shell23_4_tool
    add(part_5.part.fuse(shell23_4_tool.part, tol=0.00001))


with BuildPart() as shell23_5_tool:
    # Shell23 5 outline → Shell23 5 (revolve)
    with BuildSketch(Plane(origin=(95, 0, -55), x_dir=(1, 0, 0), z_dir=(0, 0, 1))):
        Polygon((3.50000013, 21.131545478), (0, 23.234557723), (0, 21.131545056), align=None)
    revolve(axis=Axis((95, 0, -55), (0, 1, 0)))


with BuildPart() as part_7:
    add(part_6.part)


with BuildPart() as part_8:
    # Shell23 5: joined with shell23_5_tool
    add(part_7.part.fuse(shell23_5_tool.part, tol=0.00001))


with BuildPart() as shell23_6_tool:
    # Shell23 6 outline → Shell23 6 (revolve)
    with BuildSketch(Plane(origin=(95, 0, 55), x_dir=(1, 0, 0), z_dir=(0, 0, 1))):
        Polygon((3.50000013, 21.131545478), (0, 23.234557723), (0, 21.131545056), align=None)
    revolve(axis=Axis((95, 0, 55), (0, 1, 0)))


with BuildPart() as part_9:
    add(part_8.part)


with BuildPart() as part_10:
    # Shell23 6: joined with shell23_6_tool
    add(part_9.part.fuse(shell23_6_tool.part, tol=0.00001))

    # Sketch13 → Cut-Extrude5 (cut)
    with BuildSketch(Plane.ZY.offset(100)):
        with Locations((-30.891349638, 53.152115546)):
            Circle(SKETCH13_R)
        with Locations((41.77874675, 53.152115546)):
            Circle(SKETCH13_R)
    extrude(amount=-CUT_EXTRUDE5_DEPTH, mode=Mode.SUBTRACT)

    # Sketch14 → Boss-Extrude2 (add)
    with BuildSketch(Plane.XZ.offset(-58)):
        with Locations(Location((76.189917543, 49.080735978, 0), (0, 0, 270))):
            Circle(SKETCH14_R)
        with Locations(Location((76.189917543, -49.080735978, 0), (0, 0, 270))):
            Circle(SKETCH14_R)
        with Locations(Location((15.850126318, -49.080735978, 0), (0, 0, 270))):
            Circle(SKETCH14_R)
        with Locations(Location((11.040432815, 49.080735978, 0), (0, 0, 270))):
            Circle(SKETCH14_R)
        with Locations(Location((-42.522063019, 49.080735978, 0), (0, 0, 270))):
            Circle(SKETCH14_R)
        with Locations(Location((-42.522063019, -49.080735978, 0), (0, 0, 270))):
            Circle(SKETCH14_R)
    extrude(amount=BOSS_EXTRUDE2_DEPTH)

    # Fillet11
    fillet11_edges = [part_10.edges().sort_by_distance(p)[0] for p in [
        (-42.522063019, 58, -46.080735978),
        (76.189917543, 58, 52.080735978),
        (76.189917543, 58, -46.080735978),
        (15.850126318, 58, -46.080735978),
        (11.040432815, 58, 52.080735978),
        (-42.522063019, 58, 52.080735978),
    ]]
    fillet(fillet11_edges, radius=FILLET11_R)

    # Sketch15 → Cut-Extrude6 (cut)
    with BuildSketch(Plane(origin=(0, 0, -60), x_dir=(-1, 0, 0), z_dir=(0, 0, -1))):
        with Locations((46.95788262, 19.601401285)):
            Circle(SKETCH15_R)
        with Locations((-20.359361695, 19.601401285)):
            Rectangle(SKETCH15_W, SKETCH15_H)
    extrude(amount=-CUT_EXTRUDE6_DEPTH, mode=Mode.SUBTRACT)

    # Sketch16 → Cut-Extrude7 (cut)
    with BuildSketch(Plane(origin=(100, 0, 0), x_dir=(0, 0, -1), z_dir=(1, 0, 0))):
        with Locations((-45, 25)):
            Rectangle(SKETCH16_W, SKETCH16_H)
    cut_extrude7 = extrude(amount=-CUT_EXTRUDE7_DEPTH, mode=Mode.SUBTRACT)

    # LPattern1: Cut-Extrude7 ×10
    with Locations(*[(0, 0, -i * LPATTERN1_PITCH) for i in range(1, LPATTERN1_COUNT)]):
        add(cut_extrude7, mode=Mode.SUBTRACT)

    # Sketch18 → Cut-Extrude8 (cut)
    with BuildSketch(Plane(origin=(100, 0, 0), x_dir=(0, 0, -1), z_dir=(1, 0, 0))):
        with Locations((-40.127645148, 52.526648586)):
            Circle(SKETCH18_R)
        with Locations((45.381673973, 52.526648586)):
            Circle(SKETCH18_R)
    extrude(amount=-CUT_EXTRUDE8_DEPTH, mode=Mode.SUBTRACT)


solid = part_10.part
